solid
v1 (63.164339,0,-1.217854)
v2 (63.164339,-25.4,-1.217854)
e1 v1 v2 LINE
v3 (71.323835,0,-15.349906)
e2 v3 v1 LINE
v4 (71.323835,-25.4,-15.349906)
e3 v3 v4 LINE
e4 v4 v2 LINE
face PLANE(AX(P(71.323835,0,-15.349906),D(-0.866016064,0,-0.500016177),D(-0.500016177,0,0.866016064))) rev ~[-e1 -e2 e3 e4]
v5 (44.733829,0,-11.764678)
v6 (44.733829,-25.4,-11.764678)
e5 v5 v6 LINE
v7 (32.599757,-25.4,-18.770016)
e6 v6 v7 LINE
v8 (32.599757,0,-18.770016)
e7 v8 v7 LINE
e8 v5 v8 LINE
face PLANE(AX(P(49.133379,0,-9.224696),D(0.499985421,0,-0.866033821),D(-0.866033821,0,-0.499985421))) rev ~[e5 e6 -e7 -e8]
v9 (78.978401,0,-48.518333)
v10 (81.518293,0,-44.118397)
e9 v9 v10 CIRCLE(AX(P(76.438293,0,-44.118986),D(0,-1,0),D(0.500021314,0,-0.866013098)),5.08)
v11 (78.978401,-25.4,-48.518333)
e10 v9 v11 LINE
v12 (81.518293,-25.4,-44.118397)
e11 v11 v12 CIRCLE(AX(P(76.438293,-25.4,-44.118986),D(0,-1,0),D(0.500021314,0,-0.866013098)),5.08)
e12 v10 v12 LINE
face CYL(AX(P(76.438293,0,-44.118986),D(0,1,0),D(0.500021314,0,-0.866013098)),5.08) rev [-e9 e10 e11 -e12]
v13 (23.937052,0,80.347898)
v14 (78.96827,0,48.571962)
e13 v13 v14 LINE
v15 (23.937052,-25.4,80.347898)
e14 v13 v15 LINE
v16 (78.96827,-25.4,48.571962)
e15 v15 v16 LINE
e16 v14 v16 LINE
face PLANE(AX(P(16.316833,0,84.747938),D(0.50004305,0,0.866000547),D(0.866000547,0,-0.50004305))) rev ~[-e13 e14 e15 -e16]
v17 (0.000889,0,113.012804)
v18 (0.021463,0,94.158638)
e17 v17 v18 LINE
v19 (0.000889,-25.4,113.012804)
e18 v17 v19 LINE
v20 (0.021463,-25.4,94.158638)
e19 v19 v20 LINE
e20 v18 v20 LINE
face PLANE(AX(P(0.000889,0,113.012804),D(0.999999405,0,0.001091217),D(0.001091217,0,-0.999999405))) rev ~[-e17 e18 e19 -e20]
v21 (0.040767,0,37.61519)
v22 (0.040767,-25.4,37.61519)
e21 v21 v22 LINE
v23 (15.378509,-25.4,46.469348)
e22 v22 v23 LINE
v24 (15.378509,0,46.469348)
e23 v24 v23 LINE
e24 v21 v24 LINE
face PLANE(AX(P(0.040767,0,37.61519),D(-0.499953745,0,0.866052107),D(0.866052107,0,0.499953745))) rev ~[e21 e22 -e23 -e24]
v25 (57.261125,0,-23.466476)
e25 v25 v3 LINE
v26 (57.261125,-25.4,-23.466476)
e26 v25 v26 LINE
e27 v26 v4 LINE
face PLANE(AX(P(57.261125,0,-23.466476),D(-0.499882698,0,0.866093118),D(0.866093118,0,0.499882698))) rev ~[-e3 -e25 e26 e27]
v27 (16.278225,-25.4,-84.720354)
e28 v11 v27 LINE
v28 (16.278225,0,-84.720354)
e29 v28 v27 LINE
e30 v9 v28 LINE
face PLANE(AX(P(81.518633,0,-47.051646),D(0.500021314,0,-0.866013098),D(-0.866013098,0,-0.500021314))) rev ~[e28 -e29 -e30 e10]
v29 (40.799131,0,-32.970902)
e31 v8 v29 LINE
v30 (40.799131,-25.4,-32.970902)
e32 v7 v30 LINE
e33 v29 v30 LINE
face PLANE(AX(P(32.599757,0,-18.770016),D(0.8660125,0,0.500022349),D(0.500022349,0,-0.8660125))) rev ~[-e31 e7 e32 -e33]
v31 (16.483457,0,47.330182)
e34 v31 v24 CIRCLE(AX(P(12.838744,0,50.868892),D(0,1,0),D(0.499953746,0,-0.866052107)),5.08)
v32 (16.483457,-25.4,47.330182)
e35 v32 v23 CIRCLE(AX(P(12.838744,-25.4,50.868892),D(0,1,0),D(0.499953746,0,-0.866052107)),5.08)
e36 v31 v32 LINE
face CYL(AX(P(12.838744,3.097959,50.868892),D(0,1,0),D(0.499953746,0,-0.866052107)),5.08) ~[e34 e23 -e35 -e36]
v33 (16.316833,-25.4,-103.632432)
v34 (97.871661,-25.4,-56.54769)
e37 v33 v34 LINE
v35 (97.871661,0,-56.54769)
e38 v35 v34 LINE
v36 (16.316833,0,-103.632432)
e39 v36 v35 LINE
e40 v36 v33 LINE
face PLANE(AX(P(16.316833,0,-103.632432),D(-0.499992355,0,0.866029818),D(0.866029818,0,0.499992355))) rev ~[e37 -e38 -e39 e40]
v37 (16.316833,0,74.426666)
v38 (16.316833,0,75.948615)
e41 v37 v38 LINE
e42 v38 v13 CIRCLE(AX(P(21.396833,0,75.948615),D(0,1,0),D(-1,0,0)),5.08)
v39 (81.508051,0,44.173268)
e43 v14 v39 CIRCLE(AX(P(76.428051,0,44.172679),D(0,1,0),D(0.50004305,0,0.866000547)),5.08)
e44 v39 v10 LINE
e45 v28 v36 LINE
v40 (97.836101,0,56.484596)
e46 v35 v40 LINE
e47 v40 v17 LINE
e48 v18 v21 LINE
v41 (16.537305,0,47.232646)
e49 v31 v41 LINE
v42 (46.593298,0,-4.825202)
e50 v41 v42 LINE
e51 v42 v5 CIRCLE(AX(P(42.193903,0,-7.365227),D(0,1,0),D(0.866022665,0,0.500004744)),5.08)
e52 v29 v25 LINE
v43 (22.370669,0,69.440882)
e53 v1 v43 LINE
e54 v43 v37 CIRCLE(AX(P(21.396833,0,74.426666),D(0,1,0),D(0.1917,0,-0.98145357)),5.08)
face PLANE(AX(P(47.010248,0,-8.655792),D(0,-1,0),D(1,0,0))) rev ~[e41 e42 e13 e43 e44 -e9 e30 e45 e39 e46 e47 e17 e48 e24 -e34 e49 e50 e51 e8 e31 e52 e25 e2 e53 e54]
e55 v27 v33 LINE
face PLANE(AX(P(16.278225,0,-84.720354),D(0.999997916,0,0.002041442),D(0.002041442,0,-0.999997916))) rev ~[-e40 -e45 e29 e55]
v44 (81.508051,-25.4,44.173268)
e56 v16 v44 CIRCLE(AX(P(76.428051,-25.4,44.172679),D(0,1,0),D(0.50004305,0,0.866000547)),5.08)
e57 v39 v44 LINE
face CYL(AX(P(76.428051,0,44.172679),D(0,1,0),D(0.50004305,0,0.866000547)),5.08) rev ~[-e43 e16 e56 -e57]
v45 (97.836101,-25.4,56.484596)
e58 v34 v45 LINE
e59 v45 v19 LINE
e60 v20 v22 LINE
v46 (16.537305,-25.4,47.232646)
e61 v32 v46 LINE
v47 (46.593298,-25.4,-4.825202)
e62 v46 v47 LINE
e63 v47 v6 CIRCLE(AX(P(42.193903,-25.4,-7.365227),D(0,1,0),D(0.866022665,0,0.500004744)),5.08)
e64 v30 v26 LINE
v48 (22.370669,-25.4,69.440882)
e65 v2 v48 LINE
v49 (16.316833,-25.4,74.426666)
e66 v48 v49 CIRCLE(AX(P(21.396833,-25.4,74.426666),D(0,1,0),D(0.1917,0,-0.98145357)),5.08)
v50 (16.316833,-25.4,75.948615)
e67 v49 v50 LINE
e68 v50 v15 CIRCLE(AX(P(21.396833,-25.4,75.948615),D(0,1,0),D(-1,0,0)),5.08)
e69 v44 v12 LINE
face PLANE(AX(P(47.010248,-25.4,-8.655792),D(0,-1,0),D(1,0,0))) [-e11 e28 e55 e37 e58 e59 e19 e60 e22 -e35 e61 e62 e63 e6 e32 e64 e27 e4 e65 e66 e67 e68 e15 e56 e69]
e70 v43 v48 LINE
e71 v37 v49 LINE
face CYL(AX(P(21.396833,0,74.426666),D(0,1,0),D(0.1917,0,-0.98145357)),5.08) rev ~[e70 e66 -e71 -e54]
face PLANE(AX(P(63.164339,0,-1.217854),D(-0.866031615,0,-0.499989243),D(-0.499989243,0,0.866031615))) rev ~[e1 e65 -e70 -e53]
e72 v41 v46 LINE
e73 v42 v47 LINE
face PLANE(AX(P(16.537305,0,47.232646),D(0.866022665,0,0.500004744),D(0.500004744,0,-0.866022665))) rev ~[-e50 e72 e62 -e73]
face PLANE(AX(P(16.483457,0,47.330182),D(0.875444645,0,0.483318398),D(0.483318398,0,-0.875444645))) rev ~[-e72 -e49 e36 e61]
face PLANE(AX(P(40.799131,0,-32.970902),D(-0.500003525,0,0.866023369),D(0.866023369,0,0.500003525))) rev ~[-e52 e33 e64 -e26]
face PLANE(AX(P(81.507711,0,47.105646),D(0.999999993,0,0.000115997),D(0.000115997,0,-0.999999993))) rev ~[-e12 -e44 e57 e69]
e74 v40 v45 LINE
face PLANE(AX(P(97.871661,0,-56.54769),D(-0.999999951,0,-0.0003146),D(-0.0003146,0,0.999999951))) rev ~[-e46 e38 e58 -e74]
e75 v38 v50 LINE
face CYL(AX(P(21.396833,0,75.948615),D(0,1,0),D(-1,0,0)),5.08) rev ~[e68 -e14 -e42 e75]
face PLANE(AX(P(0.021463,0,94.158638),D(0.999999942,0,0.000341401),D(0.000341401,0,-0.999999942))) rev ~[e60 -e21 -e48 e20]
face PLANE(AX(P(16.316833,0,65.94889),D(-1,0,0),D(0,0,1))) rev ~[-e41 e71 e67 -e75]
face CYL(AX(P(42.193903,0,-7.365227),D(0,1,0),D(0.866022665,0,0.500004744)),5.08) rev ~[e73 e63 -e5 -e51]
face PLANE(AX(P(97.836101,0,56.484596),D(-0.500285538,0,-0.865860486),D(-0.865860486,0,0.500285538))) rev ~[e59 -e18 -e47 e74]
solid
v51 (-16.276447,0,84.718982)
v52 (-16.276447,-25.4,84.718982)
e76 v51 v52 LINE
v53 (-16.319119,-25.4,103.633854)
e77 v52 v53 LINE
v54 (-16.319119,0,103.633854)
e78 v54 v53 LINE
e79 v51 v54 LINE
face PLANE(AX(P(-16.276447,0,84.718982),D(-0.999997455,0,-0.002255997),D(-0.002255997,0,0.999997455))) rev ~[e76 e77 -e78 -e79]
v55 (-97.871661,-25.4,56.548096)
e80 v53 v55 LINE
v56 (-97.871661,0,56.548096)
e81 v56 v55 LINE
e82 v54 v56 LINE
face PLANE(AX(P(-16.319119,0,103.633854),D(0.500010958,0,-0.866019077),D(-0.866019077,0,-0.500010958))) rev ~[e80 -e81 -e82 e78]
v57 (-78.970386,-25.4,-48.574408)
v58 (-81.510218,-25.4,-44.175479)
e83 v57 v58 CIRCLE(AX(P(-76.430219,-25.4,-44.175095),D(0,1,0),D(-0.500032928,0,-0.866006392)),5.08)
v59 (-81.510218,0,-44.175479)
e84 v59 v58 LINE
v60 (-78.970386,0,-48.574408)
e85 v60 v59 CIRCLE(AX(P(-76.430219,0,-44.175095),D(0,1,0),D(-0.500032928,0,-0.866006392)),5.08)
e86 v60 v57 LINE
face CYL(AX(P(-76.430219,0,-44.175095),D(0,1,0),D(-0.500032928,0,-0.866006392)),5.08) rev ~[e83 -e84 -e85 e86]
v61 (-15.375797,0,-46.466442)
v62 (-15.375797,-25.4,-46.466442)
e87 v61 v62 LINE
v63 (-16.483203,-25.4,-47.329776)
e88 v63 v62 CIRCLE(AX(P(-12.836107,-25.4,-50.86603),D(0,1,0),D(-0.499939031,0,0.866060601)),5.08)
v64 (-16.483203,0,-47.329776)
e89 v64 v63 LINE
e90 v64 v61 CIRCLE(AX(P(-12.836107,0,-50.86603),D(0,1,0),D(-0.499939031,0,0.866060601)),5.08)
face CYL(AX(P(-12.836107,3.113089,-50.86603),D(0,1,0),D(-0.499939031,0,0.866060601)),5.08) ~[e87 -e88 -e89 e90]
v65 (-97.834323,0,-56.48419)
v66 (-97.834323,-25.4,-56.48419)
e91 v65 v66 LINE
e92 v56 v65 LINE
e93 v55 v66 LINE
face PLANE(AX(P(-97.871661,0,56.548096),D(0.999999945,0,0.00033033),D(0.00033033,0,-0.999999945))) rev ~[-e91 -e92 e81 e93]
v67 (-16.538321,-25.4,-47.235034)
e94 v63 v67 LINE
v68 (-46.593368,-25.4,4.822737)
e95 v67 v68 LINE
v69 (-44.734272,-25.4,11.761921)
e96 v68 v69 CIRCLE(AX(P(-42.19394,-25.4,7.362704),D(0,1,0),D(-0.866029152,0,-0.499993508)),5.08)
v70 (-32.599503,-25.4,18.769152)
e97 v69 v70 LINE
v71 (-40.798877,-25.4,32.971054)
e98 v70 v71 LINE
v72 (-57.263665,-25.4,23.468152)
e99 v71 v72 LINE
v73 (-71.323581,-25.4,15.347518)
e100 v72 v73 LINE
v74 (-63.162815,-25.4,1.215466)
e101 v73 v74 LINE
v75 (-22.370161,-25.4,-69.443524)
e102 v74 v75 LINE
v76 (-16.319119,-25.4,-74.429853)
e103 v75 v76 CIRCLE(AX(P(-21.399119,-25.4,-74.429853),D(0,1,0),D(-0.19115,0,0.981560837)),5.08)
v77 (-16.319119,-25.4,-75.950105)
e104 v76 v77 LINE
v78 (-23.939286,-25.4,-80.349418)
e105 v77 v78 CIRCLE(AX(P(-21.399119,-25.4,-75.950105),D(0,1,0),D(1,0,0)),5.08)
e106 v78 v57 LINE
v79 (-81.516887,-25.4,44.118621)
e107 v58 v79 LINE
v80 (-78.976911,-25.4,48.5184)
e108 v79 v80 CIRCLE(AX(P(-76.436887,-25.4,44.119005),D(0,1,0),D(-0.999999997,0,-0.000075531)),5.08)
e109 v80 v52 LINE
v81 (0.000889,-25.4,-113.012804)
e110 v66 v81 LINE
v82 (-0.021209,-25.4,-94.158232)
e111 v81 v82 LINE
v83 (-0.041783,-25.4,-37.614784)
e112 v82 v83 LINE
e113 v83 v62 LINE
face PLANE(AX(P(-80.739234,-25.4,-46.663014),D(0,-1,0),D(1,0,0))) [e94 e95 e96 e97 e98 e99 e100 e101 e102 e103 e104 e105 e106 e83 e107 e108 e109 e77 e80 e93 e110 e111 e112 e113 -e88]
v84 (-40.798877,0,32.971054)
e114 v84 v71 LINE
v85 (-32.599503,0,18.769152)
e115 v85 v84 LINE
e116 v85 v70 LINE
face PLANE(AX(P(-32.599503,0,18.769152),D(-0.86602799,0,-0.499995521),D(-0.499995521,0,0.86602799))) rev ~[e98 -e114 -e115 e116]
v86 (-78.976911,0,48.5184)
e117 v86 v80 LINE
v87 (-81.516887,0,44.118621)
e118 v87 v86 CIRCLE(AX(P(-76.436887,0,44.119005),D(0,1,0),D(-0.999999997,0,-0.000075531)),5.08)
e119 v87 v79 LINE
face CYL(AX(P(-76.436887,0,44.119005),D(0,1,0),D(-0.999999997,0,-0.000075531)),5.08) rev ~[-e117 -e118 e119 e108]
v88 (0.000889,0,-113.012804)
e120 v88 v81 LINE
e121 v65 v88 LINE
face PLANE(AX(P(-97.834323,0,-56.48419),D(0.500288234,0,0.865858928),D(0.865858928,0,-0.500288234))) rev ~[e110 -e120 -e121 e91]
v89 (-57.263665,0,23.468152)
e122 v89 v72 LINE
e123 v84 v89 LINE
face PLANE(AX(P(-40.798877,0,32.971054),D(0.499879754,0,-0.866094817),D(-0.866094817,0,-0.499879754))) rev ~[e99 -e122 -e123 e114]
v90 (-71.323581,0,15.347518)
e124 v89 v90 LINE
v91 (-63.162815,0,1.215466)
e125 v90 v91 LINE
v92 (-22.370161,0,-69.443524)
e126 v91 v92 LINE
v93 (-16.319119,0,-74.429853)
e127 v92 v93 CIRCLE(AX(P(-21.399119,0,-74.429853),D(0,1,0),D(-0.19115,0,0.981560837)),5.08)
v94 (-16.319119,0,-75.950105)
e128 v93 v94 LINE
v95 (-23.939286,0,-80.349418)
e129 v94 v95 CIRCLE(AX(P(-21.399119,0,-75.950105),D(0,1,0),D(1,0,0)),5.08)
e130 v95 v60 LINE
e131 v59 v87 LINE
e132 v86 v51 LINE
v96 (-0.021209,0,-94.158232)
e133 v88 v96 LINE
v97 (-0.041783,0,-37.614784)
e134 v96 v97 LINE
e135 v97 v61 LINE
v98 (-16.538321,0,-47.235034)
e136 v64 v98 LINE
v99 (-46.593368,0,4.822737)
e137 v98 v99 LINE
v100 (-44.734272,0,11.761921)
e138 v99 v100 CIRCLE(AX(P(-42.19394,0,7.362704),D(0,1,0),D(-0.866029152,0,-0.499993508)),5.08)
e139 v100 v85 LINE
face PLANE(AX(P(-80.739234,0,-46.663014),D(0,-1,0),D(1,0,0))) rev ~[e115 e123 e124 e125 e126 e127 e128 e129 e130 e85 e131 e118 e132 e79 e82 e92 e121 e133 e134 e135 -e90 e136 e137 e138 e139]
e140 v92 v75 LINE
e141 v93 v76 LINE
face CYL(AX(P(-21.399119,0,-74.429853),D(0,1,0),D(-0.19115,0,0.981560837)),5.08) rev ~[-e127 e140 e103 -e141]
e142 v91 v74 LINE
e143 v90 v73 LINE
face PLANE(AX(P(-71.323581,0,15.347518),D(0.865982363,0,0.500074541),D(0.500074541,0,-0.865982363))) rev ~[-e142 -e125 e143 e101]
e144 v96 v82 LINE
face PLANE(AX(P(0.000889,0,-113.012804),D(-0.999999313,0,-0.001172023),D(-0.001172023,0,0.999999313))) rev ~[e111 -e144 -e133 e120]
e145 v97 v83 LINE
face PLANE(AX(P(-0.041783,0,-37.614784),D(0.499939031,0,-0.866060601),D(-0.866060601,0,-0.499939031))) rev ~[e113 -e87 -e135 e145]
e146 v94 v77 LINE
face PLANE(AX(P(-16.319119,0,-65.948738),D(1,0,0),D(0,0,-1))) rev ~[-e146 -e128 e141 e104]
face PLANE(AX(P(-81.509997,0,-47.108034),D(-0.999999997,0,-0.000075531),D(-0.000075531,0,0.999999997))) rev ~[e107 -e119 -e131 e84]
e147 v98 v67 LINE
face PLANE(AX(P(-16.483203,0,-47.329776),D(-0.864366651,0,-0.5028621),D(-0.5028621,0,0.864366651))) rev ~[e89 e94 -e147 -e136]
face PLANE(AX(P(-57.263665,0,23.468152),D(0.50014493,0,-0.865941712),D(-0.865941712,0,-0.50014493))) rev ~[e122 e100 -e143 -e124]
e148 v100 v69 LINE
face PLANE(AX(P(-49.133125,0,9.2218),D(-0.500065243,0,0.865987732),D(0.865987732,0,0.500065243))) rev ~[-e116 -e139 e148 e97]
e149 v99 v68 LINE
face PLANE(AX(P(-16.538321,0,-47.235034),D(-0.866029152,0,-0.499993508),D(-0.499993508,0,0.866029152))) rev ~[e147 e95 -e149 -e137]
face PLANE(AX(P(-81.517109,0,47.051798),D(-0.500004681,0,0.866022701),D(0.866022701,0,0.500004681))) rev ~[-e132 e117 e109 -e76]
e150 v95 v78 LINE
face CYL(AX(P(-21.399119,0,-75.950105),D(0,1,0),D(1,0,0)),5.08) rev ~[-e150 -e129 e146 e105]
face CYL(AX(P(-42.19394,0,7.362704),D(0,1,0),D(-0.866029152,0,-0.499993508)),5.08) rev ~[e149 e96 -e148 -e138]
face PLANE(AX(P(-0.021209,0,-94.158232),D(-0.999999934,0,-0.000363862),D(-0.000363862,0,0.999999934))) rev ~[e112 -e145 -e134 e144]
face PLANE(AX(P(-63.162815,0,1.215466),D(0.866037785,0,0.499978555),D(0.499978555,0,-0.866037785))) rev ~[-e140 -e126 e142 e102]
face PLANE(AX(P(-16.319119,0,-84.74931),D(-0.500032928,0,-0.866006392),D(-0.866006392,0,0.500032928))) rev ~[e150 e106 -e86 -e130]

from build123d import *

# Parameters (mm, degrees)
F1_DEPTH      = 25.4
F2_T1_DEPTH   = 25.4
F2_T3_DEPTH   = 31.626178471
F2_2_T1_DEPTH = 25.4
F2_2_T3_DEPTH = 31.595918111


# Not quite as in the source:
# - a fillet or chamfer that OpenCascade refuses, or shapes differently, is made with other operations: its cross-section is extruded or revolved along the edge and cut away or added


with BuildPart() as f1:
    # F0 (on Front) → F1 (new body)
    with BuildSketch(Plane.XZ):
        Polygon((-16.319119, 103.6338542), (-97.871661, 56.5480962), (-97.834323, -56.4841898), (0.000889, -113.0128042), (-0.021209, -94.1582318), (-0.041783, -37.6147838), (-16.454247, -47.0889838), (-16.483203, -47.3297758), (-16.538321, -47.2350338), (-49.133125, 9.2218002), (-32.599503, 18.7691522), (-40.798877, 32.9710542), (-57.263665, 23.4681522), (-71.323581, 15.3475182), (-63.162815, 1.2154662), (-22.370161, -69.4435238), (-16.319119, -65.9487378), (-16.319119, -84.7493098), (-81.509997, -47.1080338), (-81.517109, 47.0517982), (-16.276447, 84.7189822), align=None)
    extrude(amount=F1_DEPTH)

    # F2: fillet of radius 5.08 on 6 edges, made by hand

    # F2_s2 → F2_t1 (join)
    with BuildSketch(Plane.XZ):
        with BuildLine():
            ThreePointArc((-78.9703857887, -48.5744077693), (-80.8295799283, -46.715177806), (-81.5102184992, -44.1754789968))
            Line((-81.5102184992, -44.1754789968), (-81.509997, -47.1080338))
            Line((-81.509997, -47.1080338), (-78.9703857887, -48.5744077693))
        make_face()
        with BuildLine():
            ThreePointArc((-16.319119, -75.9501053756), (-18.8592026389, -80.3495627147), (-23.939286275, -80.3494178464))
            Line((-23.939286275, -80.3494178464), (-16.319119, -84.7493098))
            Line((-16.319119, -84.7493098), (-16.319119, -75.9501053756))
        make_face()
        with BuildLine():
            ThreePointArc((-22.370161, -69.4435238), (-18.1685225659, -70.5094387585), (-16.319119, -74.4298528539))
            Line((-16.319119, -74.4298528539), (-16.319119, -65.9487378))
            Line((-16.319119, -65.9487378), (-22.370161, -69.4435238))
        make_face()
        with BuildLine():
            ThreePointArc((-81.5168874538, 44.1186213446), (-80.8363993057, 46.6588270036), (-78.9769112502, 48.5184003635))
            Line((-78.9769112502, 48.5184003635), (-81.517109, 47.0517982))
            Line((-81.517109, 47.0517982), (-81.5168874538, 44.1186213446))
        make_face()
        with BuildLine():
            ThreePointArc((-46.5933683691, 4.8227365177), (-47.1008880705, 8.6773378396), (-44.7342717126, 11.7619212171))
            Line((-44.7342717126, 11.7619212171), (-49.133125, 9.2218002))
            Line((-49.133125, 9.2218002), (-46.5933683691, 4.8227365177))
        make_face()
    extrude(amount=F2_T1_DEPTH)

    # F2_s4 → F2_t3 (cut)
    with BuildSketch(Plane.XZ.offset(-3.1130892355)):
        with BuildLine():
            ThreePointArc((-15.3757974258, -46.4664418736), (-15.9594734444, -46.8596619247), (-16.483203, -47.3297758))
            Line((-16.483203, -47.3297758), (-16.454247, -47.0889838))
            Line((-16.454247, -47.0889838), (-15.3757974258, -46.4664418736))
        make_face()
    extrude(amount=F2_T3_DEPTH, mode=Mode.SUBTRACT)


with BuildPart() as f1b:
    # F0 (on Front) → F1, piece 2 (new body)
    with BuildSketch(Plane.XZ):
        Polygon((16.316833, -103.6324318), (97.871661, -56.5476898), (97.836101, 56.4845962), (0.000889, 113.0128042), (0.021463, 94.1586382), (0.040767, 37.6151902), (16.451707, 47.0888822), (16.483457, 47.3301822), (16.537305, 47.2326462), (49.133379, -9.2246958), (32.599757, -18.7700158), (40.799131, -32.9709018), (57.261125, -23.4664758), (71.323835, -15.3499058), (63.164339, -1.2178538), (22.370669, 69.4408822), (16.316833, 65.9488902), (16.316833, 84.7479382), (81.507711, 47.1056462), (81.518633, -47.0516458), (16.278225, -84.7203538), align=None)
    extrude(amount=F1_DEPTH)

    # F2#2: fillet of radius 5.08 on 6 edges, made by hand

    # F2_2_s2 → F2_2_t1 (join)
    with BuildSketch(Plane.XZ):
        with BuildLine():
            ThreePointArc((46.5932982219, -4.8252024991), (47.1007988179, -8.6800552118), (44.7338290233, -11.7646784114))
            Line((44.7338290233, -11.7646784114), (49.133379, -9.2246958))
            Line((49.133379, -9.2246958), (46.5932982219, -4.8252024991))
        make_face()
        with BuildLine():
            ThreePointArc((16.316833, 75.9486150149), (18.8569423497, 80.3480871974), (23.9370516947, 80.3478977955))
            Line((23.9370516947, 80.3478977955), (16.316833, 84.7479382))
            Line((16.316833, 84.7479382), (16.316833, 75.9486150149))
        make_face()
        with BuildLine():
            ThreePointArc((22.370669, 69.4408822), (18.1673351195, 70.505347241), (16.316833, 74.4266663354))
            Line((16.316833, 74.4266663354), (16.316833, 65.9488902))
            Line((16.316833, 65.9488902), (22.370669, 69.4408822))
        make_face()
        with BuildLine():
            ThreePointArc((78.968269877, 48.5719615374), (80.8273760471, 46.7128245665), (81.5080511482, 44.1732680235))
            Line((81.5080511482, 44.1732680235), (81.507711, 47.1056462))
            Line((81.507711, 47.1056462), (78.968269877, 48.5719615374))
        make_face()
        with BuildLine():
            ThreePointArc((78.9784010584, -48.5183327536), (80.8378803981, -46.6586769125), (81.5182927508, -44.1183969491))
            Line((81.5182927508, -44.1183969491), (81.518633, -47.0516458))
            Line((81.518633, -47.0516458), (78.9784010584, -48.5183327536))
        make_face()
    extrude(amount=F2_2_T1_DEPTH)

    # F2_2_s4 → F2_2_t3 (cut)
    with BuildSketch(Plane.XZ.offset(-3.0979590555)):
        with BuildLine():
            ThreePointArc((15.3785094128, 46.4693477068), (15.9607949827, 46.861499235), (16.483457, 47.3301822))
            Line((16.483457, 47.3301822), (16.451707, 47.0888822))
            Line((16.451707, 47.0888822), (15.3785094128, 46.4693477068))
        make_face()
    extrude(amount=F2_2_T3_DEPTH, mode=Mode.SUBTRACT)


solid = Compound([f1.part, f1b.part])
